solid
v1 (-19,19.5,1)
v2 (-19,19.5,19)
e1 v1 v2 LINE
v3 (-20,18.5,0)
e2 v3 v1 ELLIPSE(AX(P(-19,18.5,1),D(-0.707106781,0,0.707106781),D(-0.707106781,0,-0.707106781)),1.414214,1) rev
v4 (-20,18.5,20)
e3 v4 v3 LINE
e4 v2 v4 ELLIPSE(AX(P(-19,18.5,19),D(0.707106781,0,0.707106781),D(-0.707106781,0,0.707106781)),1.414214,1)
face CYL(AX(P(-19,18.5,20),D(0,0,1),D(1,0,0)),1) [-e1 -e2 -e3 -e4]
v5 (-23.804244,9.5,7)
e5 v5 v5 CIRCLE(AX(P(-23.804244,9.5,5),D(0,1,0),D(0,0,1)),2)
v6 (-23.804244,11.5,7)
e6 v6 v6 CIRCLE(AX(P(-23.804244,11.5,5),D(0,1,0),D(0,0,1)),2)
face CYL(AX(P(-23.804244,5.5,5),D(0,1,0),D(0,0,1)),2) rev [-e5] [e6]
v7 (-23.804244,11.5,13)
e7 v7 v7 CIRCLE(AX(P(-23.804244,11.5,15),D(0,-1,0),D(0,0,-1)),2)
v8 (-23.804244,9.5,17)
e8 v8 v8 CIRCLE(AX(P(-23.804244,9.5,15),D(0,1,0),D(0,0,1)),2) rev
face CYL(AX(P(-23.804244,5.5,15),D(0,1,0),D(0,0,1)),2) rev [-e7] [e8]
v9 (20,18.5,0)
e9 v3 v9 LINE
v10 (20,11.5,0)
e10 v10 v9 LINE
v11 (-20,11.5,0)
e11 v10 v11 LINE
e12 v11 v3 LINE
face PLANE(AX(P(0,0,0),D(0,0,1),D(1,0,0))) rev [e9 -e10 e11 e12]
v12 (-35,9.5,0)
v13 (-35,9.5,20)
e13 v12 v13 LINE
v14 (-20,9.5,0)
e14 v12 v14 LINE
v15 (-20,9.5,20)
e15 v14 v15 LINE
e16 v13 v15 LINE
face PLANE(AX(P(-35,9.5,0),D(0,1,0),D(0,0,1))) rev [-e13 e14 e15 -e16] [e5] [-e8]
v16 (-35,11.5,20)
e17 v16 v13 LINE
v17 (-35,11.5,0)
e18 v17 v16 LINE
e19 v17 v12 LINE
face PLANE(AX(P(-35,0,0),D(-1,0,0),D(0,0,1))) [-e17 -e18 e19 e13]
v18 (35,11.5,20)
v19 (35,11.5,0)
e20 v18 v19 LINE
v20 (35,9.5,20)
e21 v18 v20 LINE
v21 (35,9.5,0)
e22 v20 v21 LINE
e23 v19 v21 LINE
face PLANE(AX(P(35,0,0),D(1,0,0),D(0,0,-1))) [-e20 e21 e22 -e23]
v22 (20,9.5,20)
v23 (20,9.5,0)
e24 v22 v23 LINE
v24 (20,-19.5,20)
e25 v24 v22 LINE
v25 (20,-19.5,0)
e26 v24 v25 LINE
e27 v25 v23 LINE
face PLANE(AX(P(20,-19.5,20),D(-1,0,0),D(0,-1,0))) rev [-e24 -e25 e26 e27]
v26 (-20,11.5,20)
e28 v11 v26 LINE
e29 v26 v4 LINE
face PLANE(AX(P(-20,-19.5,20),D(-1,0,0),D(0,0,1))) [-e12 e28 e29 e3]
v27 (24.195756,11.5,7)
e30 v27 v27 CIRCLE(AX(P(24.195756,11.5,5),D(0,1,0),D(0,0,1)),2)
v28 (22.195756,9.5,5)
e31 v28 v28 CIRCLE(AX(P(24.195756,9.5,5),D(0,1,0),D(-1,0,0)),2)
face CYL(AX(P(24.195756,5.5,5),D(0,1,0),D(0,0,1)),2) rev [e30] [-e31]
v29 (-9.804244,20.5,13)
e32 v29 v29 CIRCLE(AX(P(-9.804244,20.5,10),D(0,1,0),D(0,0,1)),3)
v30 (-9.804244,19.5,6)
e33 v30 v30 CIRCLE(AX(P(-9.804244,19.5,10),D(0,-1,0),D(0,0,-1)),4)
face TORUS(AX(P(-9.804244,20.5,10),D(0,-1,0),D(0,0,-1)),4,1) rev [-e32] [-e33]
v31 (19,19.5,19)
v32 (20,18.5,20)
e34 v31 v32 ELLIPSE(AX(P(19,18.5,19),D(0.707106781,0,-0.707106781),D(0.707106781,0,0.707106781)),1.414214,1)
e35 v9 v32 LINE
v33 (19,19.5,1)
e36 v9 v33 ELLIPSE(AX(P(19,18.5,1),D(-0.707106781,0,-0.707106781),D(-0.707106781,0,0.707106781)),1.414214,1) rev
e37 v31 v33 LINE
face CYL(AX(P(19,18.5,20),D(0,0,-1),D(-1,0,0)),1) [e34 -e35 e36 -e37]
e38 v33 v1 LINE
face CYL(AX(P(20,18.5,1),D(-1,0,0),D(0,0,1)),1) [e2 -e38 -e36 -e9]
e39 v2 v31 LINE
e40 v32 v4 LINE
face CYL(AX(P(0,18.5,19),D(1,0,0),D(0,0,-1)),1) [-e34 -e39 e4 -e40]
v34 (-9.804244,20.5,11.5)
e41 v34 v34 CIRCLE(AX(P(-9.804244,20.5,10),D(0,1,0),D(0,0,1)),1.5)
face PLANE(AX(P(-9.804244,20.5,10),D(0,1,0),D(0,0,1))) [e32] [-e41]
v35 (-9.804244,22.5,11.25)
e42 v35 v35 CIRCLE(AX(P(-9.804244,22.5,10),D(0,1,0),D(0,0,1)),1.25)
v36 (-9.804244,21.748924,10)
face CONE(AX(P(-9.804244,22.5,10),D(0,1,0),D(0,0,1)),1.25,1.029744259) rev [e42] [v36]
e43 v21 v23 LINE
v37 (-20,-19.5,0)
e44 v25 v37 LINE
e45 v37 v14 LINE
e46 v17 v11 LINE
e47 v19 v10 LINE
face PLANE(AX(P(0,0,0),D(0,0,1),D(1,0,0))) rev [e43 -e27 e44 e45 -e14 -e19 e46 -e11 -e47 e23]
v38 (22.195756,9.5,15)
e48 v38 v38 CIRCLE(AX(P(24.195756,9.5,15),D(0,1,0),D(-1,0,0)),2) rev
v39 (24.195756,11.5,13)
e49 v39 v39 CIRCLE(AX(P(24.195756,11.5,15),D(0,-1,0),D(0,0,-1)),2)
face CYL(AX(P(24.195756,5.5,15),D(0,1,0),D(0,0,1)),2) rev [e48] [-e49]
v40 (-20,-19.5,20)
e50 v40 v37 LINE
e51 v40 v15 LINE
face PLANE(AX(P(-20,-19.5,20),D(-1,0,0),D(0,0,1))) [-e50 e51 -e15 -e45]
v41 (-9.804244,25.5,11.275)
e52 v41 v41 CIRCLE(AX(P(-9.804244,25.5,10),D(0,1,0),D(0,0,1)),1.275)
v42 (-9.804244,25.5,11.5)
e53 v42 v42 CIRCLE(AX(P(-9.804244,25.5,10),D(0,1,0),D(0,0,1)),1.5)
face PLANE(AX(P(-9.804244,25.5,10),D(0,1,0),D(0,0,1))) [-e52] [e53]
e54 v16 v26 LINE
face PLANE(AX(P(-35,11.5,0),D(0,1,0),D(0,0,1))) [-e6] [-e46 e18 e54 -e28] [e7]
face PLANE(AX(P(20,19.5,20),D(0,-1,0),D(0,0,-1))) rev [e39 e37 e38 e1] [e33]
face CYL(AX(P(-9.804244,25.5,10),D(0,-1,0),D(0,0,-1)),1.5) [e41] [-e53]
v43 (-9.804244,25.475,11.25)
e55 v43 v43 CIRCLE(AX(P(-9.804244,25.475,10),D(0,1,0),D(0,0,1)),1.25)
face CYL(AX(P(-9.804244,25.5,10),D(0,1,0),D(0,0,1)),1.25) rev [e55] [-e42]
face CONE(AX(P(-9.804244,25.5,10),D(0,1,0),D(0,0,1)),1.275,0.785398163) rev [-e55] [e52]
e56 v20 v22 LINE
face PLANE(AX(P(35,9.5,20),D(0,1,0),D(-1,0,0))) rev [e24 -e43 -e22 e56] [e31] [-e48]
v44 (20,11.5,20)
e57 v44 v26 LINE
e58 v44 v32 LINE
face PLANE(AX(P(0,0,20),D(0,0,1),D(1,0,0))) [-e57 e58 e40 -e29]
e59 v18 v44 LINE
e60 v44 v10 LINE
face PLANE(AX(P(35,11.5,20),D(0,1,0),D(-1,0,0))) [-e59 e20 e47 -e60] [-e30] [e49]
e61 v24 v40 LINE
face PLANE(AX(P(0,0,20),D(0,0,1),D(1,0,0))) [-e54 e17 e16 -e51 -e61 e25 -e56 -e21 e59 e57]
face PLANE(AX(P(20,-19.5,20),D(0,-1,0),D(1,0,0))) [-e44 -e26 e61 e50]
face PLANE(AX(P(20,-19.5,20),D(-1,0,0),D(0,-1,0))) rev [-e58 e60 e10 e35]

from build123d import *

# Parameters (mm, degrees)
SKETCH_1_W                   = 40
SKETCH_1_H                   = 39
EXTRUDE_1_DEPTH              = 20
SKETCH_2_W                   = 20
SKETCH_2_H                   = 2
EXTRUDE_2_DEPTH              = 15
SKETCH_6_W                   = 20
SKETCH_6_H                   = 2
EXTRUDE_3_DEPTH              = 15
SKETCH_8_R                   = 2
CUT_EXTRUDE_1_DEPTH          = 6
SKETCH_11_R                  = 3
EXTRUDE_5_DEPTH              = 1
SKETCH_16_R                  = 1.5
EXTRUDE_7_DEPTH              = 5
HOLE_WIZARD_M3_3_D           = 2.5
HOLE_WIZARD_M3_3_DEPTH       = 3
HOLE_WIZARD_M3_3_CSINK_D     = 2.55
HOLE_WIZARD_M3_3_CSINK_ANGLE = 90
HOLE_WIZARD_M3_3_TIP         = 0.751075774
FILLET_4_R                   = 1


with BuildPart() as part:
    # 草图1 → 凸台-拉伸1 (new body)
    with BuildSketch(Plane.XY):
        Rectangle(SKETCH_1_W, SKETCH_1_H)
    extrude(amount=EXTRUDE_1_DEPTH)

    # 草图2 → 凸台-拉伸2 (add)
    with BuildSketch(Plane.ZY.offset(20)):
        with Locations((10, 10.5)):
            Rectangle(SKETCH_2_W, SKETCH_2_H)
    extrude(amount=EXTRUDE_2_DEPTH)

    # 草图6 → 凸台-拉伸3 (add)
    with BuildSketch(Plane(origin=(20, 0, 0), x_dir=(0, 0, -1), z_dir=(1, 0, 0))):
        with Locations((-10, 10.5)):
            Rectangle(SKETCH_6_W, SKETCH_6_H)
    extrude(amount=EXTRUDE_3_DEPTH)

    # 草图8 → 切除-拉伸1 (cut)
    with BuildSketch(Plane(origin=(0, 11.5, 0), x_dir=(1, 0, 0), z_dir=(0, 1, 0))):
        with Locations(Location((-23.804244171, -5, 0), (0, 0, 270))):
            Circle(SKETCH_8_R)
        with Locations(Location((-23.804244171, -15, 0), (0, 0, 270))):
            Circle(SKETCH_8_R)
        with Locations(Location((24.195755829, -5, 0), (0, 0, 270))):
            Circle(SKETCH_8_R)
        with Locations(Location((24.195755829, -15, 0), (0, 0, 180))):
            Circle(SKETCH_8_R)
    extrude(amount=-CUT_EXTRUDE_1_DEPTH, mode=Mode.SUBTRACT)

    # 草图11 → 凸台-拉伸5 (add)
    with BuildSketch(Plane(origin=(0, 19.5, 0), x_dir=(1, 0, 0), z_dir=(0, 1, 0))):
        with Locations(Location((-9.804244171, -10, 0), (0, 0, 90))):
            Circle(SKETCH_11_R)
    extrude(amount=EXTRUDE_5_DEPTH)

    # 草图16 → 凸台-拉伸7 (add)
    with BuildSketch(Plane(origin=(0, 20.5, 0), x_dir=(1, 0, 0), z_dir=(0, 1, 0))):
        with Locations(Location((-9.804244171, -10, 0), (0, 0, 270))):
            Circle(SKETCH_16_R)
    extrude(amount=EXTRUDE_7_DEPTH)

    # M3 螺纹孔的螺纹孔钻头3
    with Locations(Plane(origin=(0, 25.5, 0), x_dir=(1, 0, 0), z_dir=(0, 1, 0))):
        with Locations((-9.804244171, -10)):
            CounterSinkHole(HOLE_WIZARD_M3_3_D / 2, HOLE_WIZARD_M3_3_CSINK_D / 2, depth=HOLE_WIZARD_M3_3_DEPTH, counter_sink_angle=HOLE_WIZARD_M3_3_CSINK_ANGLE)
            with Locations((0, 0, -(HOLE_WIZARD_M3_3_DEPTH + HOLE_WIZARD_M3_3_TIP / 2))):  # 118° drill point
                Cone(0, HOLE_WIZARD_M3_3_D / 2, HOLE_WIZARD_M3_3_TIP, mode=Mode.SUBTRACT)

    # 圆角4
    fillet_4_edges = [part.edges().sort_by_distance(p)[0] for p in [
        (0, 19.5, 0),
        (-9.804244171, 19.5, 13),
        (-20, 19.5, 10),
        (20, 19.5, 10),
        (0, 19.5, 20),
    ]]
    fillet(fillet_4_edges, radius=FILLET_4_R - 0.0001)  # a hair under: the kernel refuses the full size


solid = part.part
